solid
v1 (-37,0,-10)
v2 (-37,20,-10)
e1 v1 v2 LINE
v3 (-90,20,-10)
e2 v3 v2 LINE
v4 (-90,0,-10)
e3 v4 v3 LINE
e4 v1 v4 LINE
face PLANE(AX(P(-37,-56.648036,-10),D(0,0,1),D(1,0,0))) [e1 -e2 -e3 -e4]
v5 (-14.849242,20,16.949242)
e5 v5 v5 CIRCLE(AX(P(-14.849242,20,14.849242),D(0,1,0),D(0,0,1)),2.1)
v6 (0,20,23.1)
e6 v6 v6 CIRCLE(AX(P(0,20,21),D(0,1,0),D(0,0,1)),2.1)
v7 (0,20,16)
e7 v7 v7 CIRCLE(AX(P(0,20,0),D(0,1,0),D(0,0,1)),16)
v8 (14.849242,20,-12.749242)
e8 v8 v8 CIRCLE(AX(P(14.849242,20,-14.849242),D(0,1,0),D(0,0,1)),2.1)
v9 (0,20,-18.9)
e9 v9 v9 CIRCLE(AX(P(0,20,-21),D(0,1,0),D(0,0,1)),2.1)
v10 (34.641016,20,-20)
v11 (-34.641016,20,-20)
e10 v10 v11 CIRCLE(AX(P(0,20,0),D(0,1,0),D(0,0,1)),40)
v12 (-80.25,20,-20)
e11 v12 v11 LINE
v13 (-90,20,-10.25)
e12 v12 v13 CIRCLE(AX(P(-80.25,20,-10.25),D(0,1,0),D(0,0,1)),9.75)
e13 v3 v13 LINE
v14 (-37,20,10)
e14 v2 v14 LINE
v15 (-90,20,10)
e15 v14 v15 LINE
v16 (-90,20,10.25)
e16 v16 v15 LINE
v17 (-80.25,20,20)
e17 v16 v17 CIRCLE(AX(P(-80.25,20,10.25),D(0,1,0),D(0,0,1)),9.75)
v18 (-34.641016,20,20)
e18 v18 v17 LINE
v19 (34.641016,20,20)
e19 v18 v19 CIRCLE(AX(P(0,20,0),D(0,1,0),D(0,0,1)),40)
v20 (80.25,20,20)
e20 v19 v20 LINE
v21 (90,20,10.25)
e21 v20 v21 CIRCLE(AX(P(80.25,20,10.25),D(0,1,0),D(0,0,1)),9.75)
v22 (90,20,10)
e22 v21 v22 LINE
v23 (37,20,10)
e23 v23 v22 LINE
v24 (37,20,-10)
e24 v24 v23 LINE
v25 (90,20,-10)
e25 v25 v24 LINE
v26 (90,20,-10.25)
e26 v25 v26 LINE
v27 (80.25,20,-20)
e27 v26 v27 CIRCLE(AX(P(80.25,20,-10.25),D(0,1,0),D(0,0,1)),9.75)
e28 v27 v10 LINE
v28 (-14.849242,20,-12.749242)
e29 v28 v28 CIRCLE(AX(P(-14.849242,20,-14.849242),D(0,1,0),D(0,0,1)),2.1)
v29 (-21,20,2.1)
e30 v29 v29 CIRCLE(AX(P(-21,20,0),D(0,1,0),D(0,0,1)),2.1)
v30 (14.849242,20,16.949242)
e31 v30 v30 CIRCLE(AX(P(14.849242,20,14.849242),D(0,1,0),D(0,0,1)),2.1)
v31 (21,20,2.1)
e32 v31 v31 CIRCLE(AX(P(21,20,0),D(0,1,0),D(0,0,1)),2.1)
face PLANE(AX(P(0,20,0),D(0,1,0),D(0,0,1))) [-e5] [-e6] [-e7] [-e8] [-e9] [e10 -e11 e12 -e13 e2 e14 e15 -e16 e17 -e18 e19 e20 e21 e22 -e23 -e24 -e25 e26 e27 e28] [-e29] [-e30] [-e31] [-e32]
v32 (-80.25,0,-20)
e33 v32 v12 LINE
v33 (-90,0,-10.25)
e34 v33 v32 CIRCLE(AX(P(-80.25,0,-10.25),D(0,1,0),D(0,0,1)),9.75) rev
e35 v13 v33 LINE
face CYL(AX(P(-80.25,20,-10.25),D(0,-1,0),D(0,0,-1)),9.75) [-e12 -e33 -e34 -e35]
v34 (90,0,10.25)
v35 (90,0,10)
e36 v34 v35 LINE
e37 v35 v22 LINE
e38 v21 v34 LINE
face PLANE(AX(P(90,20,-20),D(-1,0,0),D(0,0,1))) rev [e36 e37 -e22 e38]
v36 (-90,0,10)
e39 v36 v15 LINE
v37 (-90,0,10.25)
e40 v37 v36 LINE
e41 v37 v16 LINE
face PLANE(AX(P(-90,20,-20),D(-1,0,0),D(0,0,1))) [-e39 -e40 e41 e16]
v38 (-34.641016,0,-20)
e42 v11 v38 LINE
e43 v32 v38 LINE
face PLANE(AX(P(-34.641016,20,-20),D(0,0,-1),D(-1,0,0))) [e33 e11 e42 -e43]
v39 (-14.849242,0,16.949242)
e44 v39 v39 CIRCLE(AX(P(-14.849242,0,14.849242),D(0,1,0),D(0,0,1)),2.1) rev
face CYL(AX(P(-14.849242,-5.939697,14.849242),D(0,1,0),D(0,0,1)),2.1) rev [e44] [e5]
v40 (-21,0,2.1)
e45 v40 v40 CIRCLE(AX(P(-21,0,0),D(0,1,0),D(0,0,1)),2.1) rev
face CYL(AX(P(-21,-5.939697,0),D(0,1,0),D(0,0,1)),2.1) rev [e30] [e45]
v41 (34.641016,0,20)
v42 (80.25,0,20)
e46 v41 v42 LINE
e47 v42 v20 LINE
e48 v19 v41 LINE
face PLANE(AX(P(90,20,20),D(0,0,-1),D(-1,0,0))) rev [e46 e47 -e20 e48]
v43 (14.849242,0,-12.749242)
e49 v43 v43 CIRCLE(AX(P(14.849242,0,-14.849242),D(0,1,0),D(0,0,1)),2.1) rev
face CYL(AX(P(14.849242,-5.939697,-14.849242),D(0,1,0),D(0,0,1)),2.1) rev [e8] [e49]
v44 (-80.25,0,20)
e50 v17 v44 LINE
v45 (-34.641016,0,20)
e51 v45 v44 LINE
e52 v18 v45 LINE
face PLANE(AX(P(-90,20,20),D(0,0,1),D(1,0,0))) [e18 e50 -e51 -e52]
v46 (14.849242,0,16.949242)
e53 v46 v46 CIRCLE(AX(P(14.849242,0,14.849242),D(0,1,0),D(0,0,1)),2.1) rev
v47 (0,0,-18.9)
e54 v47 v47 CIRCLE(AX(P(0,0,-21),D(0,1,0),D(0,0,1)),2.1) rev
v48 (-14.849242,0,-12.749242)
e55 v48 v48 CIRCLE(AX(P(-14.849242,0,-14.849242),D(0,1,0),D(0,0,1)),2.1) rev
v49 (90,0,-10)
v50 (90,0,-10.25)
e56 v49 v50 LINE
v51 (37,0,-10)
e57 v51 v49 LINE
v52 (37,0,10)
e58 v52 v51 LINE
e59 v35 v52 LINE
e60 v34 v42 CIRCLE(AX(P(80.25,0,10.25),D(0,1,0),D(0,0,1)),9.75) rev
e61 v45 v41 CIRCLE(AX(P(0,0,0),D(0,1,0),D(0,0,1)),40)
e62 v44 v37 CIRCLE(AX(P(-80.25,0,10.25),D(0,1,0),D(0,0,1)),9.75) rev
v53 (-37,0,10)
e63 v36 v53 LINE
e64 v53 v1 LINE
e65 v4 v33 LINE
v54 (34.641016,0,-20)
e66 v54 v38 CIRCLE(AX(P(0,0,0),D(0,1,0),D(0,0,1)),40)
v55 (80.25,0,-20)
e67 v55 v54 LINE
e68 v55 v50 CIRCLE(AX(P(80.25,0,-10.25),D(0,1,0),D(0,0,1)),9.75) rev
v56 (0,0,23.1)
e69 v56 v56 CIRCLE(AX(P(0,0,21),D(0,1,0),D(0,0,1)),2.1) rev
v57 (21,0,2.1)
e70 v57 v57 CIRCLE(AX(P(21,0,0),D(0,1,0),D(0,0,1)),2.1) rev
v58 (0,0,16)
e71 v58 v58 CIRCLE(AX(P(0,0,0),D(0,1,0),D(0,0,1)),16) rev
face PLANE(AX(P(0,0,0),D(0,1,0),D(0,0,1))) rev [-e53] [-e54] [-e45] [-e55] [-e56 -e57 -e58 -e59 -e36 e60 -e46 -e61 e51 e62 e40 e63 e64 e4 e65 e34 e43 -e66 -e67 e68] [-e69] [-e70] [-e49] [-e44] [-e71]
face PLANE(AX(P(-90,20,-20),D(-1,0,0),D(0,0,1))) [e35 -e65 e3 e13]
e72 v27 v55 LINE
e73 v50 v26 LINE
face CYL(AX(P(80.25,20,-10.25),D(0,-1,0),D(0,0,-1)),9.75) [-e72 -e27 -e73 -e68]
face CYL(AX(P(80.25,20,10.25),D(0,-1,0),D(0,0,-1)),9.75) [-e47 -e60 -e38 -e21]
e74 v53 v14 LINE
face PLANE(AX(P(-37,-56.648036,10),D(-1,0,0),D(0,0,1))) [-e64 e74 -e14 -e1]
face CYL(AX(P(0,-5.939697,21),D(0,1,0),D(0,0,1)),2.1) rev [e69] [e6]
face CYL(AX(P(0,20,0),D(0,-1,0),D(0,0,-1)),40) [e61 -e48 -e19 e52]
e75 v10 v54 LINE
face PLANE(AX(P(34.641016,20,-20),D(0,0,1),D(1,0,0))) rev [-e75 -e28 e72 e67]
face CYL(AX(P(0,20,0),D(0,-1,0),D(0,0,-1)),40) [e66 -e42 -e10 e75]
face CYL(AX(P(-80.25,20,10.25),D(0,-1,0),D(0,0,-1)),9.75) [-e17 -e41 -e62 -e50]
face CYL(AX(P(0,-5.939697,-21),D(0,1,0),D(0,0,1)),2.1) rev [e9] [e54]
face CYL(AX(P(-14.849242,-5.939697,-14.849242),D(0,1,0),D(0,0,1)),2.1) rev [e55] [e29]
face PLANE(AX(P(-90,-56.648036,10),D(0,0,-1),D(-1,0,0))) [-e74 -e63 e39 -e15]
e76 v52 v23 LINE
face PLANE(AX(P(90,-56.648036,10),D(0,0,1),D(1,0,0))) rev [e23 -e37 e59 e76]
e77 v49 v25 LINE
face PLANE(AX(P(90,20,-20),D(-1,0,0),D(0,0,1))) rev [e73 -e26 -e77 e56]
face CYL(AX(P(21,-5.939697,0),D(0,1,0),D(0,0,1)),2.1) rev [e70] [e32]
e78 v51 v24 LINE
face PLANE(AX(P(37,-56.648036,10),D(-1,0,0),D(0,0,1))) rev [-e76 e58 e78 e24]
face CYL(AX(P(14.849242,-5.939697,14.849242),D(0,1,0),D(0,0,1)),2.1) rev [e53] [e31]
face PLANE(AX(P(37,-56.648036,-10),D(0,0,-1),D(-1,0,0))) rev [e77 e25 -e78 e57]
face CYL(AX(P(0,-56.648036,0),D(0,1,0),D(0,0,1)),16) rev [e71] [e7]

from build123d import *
from build123d.topology import SkipClean

# Parameters (mm, degrees)
BOSS_EXTRUDE1_DEPTH  = 20
SKETCH2_W            = 53
SKETCH2_H            = 20
CUT_EXTRUDE1_DEPTH   = 20
FILLET1_R            = 9.75
FILLET1_OF_MIRROR4_R = 9.75
SKETCH4_R            = 2.1
CUT_EXTRUDE3_DEPTH   = 20


with BuildPart() as part:
    # Sketch1 → Boss-Extrude1 (new body)
    with BuildSketch(Plane(origin=(0, 0, 0), x_dir=(1, 0, 0), z_dir=(0, 1, 0))):
        with BuildLine():
            Line((34.641016151, 20), (90, 20))
            Line((90, 20), (90, -20))
            Line((90, -20), (34.641016151, -20))
            ThreePointArc((34.641016151, -20), (20, -34.641016151), (0, -40))
            Line((0, -40), (0, -20))
            Line((0, -20), (0, 20))
            Line((0, 20), (0, 40))
            ThreePointArc((0, 40), (20, 34.641016151), (34.641016151, 20))
        make_face()
    boss_extrude1 = extrude(amount=BOSS_EXTRUDE1_DEPTH)

    # Sketch2 → Cut-Extrude1 (cut)
    with BuildSketch(Plane(origin=(0, 20, 0), x_dir=(1, 0, 0), z_dir=(0, 1, 0))):
        with BuildLine():
            Line((0, 16), (0, -16))
            ThreePointArc((0, -16), (16, 0), (0, 16))
        make_face()
        with Locations((63.5, 0)):
            Rectangle(SKETCH2_W, SKETCH2_H)
    cut_extrude1 = extrude(amount=-CUT_EXTRUDE1_DEPTH, mode=Mode.SUBTRACT)

    # Fillet1
    fillet1_edges = [part.edges().sort_by_distance(p)[0] for p in [
        (90, 10, -20),
        (90, 10, 20),
    ]]
    fillet(fillet1_edges, radius=FILLET1_R)

    # Mirror4: Boss-Extrude1, Cut-Extrude1 across plane
    with SkipClean():  # the faces are left unmerged after this step: merging them gives an invalid solid
        add(boss_extrude1.mirror(Plane(origin=(0, 0, 0), x_dir=(0, 0, 1), z_dir=(1, 0, 0))))
        add(cut_extrude1.mirror(Plane(origin=(0, 0, 0), x_dir=(0, 0, 1), z_dir=(1, 0, 0))), mode=Mode.SUBTRACT)
    add(part.part.scale(1), mode=Mode.REPLACE)  # the faces are merged on a copy

    # Fillet1 of Mirror4
    fillet1_of_mirror4_edges = [part.edges().sort_by_distance(p)[0] for p in [
        (-90, 10, -20),
        (-90, 10, 20),
    ]]
    fillet(fillet1_of_mirror4_edges, radius=FILLET1_OF_MIRROR4_R)

    # Sketch4 → Cut-Extrude3 (cut)
    with BuildSketch(Plane(origin=(0, 20, 0), x_dir=(1, 0, 0), z_dir=(0, 1, 0))):
        with Locations(Location((21, 0, 0), (0, 0, 270))):
            Circle(SKETCH4_R)
        with Locations(Location((14.849242405, -14.849242405, 0), (0, 0, 270))):
            Circle(SKETCH4_R)
        with Locations(Location((0, -21, 0), (0, 0, 270))):
            Circle(SKETCH4_R)
        with Locations(Location((-14.849242405, -14.849242405, 0), (0, 0, 270))):
            Circle(SKETCH4_R)
        with Locations(Location((-21, 0, 0), (0, 0, 270))):
            Circle(SKETCH4_R)
        with Locations(Location((-14.849242405, 14.849242405, 0), (0, 0, 270))):
            Circle(SKETCH4_R)
        with Locations(Location((0, 21, 0), (0, 0, 270))):
            Circle(SKETCH4_R)
        with Locations(Location((14.849242405, 14.849242405, 0), (0, 0, 270))):
            Circle(SKETCH4_R)
    extrude(amount=-CUT_EXTRUDE3_DEPTH, mode=Mode.SUBTRACT)


solid = part.part
